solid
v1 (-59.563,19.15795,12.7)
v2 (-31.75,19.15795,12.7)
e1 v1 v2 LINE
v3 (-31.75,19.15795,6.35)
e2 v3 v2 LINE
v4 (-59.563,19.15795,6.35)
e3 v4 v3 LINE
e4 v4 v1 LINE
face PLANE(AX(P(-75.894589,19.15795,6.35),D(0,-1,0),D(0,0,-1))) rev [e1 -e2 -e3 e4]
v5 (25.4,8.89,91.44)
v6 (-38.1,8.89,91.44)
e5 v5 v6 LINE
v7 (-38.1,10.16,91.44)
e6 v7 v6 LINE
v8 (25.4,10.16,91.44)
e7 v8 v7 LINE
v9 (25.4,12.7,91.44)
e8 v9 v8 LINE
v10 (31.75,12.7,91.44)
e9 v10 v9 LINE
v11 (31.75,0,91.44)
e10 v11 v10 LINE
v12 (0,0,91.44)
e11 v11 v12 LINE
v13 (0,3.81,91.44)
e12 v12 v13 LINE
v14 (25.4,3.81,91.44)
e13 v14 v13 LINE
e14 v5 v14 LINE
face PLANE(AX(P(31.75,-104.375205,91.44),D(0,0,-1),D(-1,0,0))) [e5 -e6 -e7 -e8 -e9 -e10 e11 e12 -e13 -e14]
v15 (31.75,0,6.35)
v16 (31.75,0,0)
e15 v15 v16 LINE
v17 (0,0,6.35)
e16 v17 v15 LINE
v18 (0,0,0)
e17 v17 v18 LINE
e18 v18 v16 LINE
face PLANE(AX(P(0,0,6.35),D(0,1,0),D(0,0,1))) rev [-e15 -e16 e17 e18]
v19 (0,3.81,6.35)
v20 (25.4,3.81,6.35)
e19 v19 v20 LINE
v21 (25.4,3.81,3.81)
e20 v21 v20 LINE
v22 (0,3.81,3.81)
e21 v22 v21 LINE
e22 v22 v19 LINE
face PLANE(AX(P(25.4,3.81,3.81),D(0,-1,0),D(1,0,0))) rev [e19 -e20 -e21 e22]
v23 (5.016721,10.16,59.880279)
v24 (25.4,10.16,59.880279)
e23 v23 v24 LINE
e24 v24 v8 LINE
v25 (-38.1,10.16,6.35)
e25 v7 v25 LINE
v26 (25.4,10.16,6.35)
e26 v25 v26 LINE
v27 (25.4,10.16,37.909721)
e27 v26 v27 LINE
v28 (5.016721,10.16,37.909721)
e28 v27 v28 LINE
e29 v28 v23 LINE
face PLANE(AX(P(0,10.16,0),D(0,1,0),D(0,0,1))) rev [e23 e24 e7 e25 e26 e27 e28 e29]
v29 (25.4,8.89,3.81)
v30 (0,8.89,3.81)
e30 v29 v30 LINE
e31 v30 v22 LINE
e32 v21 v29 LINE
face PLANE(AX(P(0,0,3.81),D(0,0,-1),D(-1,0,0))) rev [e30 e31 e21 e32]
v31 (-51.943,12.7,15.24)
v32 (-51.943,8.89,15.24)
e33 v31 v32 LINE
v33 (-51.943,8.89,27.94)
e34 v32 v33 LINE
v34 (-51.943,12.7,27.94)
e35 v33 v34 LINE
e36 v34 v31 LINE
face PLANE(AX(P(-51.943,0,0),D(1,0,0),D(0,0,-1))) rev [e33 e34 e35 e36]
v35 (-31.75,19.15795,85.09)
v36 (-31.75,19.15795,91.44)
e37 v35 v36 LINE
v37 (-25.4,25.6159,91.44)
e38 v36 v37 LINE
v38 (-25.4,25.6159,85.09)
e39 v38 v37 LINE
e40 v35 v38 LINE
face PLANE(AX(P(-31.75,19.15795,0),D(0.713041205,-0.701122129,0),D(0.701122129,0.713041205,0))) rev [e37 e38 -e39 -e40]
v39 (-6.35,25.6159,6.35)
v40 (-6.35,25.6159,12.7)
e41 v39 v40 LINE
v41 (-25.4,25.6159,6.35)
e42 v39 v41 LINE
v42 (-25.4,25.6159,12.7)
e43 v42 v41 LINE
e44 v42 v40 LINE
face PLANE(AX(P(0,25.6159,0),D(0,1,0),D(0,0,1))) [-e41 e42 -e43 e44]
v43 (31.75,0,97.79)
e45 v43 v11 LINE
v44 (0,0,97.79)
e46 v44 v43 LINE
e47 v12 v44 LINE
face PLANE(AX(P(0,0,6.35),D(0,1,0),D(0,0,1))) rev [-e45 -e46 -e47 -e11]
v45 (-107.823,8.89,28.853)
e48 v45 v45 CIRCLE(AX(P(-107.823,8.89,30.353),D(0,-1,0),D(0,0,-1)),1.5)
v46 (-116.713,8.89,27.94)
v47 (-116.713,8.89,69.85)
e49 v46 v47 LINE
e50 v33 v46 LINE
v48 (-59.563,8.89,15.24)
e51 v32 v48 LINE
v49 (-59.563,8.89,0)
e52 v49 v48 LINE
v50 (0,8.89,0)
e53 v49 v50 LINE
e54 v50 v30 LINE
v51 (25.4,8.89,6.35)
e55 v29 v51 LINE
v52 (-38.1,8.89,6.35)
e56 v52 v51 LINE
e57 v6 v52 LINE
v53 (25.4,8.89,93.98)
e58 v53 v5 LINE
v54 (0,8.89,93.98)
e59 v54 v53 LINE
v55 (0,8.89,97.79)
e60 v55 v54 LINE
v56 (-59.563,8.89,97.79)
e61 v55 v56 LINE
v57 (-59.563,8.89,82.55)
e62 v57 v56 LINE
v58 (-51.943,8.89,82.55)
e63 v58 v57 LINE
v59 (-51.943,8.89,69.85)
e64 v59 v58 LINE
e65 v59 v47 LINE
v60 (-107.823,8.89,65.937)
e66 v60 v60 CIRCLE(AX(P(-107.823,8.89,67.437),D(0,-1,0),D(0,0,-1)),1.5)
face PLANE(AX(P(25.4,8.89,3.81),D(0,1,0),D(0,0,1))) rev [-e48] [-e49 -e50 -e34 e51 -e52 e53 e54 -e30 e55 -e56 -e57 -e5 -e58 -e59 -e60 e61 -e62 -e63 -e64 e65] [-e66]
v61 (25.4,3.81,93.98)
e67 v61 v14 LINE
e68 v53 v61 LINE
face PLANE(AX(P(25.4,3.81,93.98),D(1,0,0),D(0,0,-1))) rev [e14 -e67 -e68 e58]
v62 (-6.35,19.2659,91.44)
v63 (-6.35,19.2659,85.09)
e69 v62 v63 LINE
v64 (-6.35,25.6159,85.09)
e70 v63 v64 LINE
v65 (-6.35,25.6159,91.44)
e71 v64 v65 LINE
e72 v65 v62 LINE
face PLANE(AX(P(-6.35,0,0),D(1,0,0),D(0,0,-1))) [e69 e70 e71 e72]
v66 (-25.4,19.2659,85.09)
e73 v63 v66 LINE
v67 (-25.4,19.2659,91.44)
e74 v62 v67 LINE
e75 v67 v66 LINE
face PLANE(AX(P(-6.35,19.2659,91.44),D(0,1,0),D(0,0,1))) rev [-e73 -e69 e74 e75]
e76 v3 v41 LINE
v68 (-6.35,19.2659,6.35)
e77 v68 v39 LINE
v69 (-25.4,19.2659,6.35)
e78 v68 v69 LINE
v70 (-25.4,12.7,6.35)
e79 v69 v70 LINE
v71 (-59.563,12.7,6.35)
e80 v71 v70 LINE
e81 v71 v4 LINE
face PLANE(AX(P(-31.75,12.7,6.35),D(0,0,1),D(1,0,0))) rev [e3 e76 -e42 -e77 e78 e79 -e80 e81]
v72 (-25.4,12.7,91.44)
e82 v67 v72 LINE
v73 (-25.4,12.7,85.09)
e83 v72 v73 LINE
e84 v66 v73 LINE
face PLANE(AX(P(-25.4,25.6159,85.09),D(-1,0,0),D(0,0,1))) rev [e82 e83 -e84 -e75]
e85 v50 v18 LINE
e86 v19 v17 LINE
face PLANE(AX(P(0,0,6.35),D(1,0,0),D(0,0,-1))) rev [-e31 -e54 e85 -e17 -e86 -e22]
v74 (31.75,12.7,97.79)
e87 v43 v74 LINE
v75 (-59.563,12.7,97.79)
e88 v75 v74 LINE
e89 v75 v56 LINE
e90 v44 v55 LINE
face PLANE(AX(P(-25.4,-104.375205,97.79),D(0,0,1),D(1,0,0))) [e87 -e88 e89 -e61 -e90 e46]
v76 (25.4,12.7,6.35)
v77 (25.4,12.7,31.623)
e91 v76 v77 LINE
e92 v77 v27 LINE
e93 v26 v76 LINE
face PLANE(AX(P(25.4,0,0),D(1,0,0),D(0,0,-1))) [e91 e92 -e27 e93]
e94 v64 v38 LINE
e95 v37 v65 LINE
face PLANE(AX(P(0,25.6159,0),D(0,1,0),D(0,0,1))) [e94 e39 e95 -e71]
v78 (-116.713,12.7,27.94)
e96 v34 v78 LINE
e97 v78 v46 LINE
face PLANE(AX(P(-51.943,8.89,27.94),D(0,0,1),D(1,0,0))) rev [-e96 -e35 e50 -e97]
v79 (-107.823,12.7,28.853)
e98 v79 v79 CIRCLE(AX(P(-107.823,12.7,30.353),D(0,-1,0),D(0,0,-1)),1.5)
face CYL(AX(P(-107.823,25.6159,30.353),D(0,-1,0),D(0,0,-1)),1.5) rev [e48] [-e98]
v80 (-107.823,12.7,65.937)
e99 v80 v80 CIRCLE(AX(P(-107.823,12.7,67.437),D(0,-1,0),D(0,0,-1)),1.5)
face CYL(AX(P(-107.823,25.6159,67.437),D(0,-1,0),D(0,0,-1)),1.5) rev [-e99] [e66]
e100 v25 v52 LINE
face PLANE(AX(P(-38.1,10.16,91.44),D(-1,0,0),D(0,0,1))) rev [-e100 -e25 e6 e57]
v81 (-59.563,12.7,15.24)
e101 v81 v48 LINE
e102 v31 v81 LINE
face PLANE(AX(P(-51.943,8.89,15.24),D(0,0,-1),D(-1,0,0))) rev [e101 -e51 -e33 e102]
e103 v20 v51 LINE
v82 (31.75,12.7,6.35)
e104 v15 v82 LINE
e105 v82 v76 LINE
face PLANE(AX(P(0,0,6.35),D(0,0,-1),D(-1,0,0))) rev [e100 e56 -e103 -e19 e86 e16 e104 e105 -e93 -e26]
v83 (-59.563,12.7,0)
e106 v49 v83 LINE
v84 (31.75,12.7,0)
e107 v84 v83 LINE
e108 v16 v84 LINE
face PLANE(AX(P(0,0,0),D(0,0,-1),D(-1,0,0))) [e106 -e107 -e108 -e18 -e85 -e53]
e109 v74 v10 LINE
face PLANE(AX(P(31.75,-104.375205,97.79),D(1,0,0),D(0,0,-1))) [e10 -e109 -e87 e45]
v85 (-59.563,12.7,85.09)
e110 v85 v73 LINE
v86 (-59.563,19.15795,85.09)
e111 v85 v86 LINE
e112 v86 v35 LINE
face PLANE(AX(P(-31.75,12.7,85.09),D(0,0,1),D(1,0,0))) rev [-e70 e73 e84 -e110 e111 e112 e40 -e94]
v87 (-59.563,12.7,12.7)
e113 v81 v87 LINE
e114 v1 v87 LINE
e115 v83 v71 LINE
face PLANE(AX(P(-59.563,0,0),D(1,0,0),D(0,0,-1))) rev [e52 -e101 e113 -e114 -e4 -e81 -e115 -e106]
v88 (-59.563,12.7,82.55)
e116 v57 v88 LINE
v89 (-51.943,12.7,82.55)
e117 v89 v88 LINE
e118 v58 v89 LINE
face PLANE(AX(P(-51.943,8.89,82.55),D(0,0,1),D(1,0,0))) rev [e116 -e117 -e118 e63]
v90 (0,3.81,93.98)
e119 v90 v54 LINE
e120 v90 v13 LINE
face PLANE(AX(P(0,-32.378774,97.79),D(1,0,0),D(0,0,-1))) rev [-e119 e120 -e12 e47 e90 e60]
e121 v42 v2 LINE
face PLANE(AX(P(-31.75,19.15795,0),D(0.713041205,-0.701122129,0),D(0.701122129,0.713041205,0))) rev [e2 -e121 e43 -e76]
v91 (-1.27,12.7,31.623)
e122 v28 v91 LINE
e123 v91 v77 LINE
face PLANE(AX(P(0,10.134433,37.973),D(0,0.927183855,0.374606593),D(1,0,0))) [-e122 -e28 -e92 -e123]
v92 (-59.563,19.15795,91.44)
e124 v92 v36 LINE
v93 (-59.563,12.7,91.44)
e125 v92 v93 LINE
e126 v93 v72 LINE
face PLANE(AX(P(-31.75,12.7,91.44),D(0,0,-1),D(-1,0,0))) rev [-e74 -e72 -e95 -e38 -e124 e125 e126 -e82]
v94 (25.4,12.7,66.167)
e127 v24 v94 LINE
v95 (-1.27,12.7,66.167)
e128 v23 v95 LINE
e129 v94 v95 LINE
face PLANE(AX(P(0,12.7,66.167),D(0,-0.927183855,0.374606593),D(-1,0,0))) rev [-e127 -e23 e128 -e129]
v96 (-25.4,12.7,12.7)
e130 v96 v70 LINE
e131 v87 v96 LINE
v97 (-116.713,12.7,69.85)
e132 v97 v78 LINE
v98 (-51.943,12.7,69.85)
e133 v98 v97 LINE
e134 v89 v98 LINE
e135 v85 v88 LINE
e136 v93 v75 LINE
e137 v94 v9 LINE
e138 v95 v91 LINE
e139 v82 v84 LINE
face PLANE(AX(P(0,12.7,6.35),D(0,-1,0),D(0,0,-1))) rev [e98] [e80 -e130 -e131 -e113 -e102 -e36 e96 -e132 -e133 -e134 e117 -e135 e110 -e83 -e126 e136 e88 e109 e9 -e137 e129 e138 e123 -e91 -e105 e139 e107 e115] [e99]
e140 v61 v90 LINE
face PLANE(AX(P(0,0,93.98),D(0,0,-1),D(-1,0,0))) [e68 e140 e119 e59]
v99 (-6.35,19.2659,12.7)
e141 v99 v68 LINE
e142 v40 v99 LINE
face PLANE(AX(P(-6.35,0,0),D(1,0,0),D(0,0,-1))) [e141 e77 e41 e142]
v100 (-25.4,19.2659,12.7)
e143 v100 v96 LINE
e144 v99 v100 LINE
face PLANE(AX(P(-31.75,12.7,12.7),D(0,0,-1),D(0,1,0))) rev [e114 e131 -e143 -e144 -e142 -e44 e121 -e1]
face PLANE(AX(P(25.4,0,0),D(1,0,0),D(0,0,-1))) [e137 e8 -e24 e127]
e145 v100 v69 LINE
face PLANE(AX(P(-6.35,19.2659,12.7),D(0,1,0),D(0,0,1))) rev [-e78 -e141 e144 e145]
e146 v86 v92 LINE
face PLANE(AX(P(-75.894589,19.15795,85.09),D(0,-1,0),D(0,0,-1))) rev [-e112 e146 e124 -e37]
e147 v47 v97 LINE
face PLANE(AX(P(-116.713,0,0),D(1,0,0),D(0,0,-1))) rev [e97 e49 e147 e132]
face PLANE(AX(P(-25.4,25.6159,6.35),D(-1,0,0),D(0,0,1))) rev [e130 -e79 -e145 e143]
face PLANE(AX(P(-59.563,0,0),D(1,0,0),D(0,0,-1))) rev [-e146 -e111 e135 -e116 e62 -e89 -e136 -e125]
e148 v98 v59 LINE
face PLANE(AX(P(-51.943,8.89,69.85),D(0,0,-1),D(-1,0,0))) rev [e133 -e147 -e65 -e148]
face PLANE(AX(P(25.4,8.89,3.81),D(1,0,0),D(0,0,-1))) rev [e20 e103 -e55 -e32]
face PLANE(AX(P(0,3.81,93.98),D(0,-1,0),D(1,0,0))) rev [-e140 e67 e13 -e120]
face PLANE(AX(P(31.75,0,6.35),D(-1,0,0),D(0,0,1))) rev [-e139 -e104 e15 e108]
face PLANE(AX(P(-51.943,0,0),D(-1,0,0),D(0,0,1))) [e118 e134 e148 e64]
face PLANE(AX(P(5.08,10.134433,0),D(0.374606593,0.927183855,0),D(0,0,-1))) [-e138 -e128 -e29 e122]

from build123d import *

# Parameters (mm, degrees)
SKETCH1_W                = 31.75
SKETCH1_H                = 12.7
BOSS_EXTRUDE1_DEPTH      = 6.35
SKETCH3_W                = 25.4
SKETCH3_H                = 5.08
CUT_EXTRUDE1_DEPTH       = 2.54
BOSS_EXTRUDE2_DEPTH      = 3.81
SKETCH5_W                = 31.75
SKETCH5_H                = 6.35
BOSS_EXTRUDE3_DEPTH      = 8.89
SKETCH6_W                = 25.4
SKETCH6_H                = 5.08
CUT_EXTRUDE2_DEPTH       = 2.54
SKETCH9_W                = 6.35
SKETCH9_H                = 3.81
BOSS_EXTRUDE5_DEPTH      = 6.35
SKETCH10_W               = 6.35
SKETCH10_H               = 6.35
BOSS_EXTRUDE6_DEPTH      = 12.9159
SKETCH12_W               = 6.35
SKETCH12_H               = 3.81
BOSS_EXTRUDE8_DEPTH      = 6.35
SKETCH14_W               = 6.35
SKETCH14_H               = 6.35
BOSS_EXTRUDE11_DEPTH     = 19.05
CUT_EXTRUDE9_DEPTH       = 101.12747092
SKETCH19_W               = 72.39
SKETCH19_H               = 3.81
BOSS_EXTRUDE12_DEPTH     = 34.163
BOSS_EXTRUDE13_DEPTH     = 27.813
SKETCH21_W               = 12.7
SKETCH21_H               = 3.81
CUT_EXTRUDE10_DEPTH      = 7.62
SKETCH22_W               = 41.91
SKETCH22_H               = 3.81
BOSS_EXTRUDE14_DEPTH     = 50.8
SKETCH23_W               = 85.09
SKETCH23_H               = 3.81
BOSS_EXTRUDE15_DEPTH     = 44.45
SKETCH24_R               = 1.5
CUT_EXTRUDE11_DEPTH      = 149.400241239
SKETCH25_W               = 41.91
SKETCH25_H               = 3.81
BOSS_EXTRUDE16_DEPTH     = 6.35
CUT_EXTRUDE12_DEPTH      = 154.181474728
CUT_EXTRUDE12_DEPTH_BACK = 154.181474728
CUT_EXTRUDE13_DEPTH      = 1.27
CHAMFER1_SIZE            = 6.35
CHAMFER1_SIZE_2          = 2.565566534


with BuildPart() as part:
    # Sketch1 → Boss-Extrude1 (new body)
    with BuildSketch(Plane.XY):
        with Locations((15.875, 6.35)):
            Rectangle(SKETCH1_W, SKETCH1_H)
    extrude(amount=BOSS_EXTRUDE1_DEPTH)

    # Sketch3 → Cut-Extrude1 (cut)
    with BuildSketch(Plane.XY.offset(6.35)):
        with Locations((12.7, 6.35)):
            Rectangle(SKETCH3_W, SKETCH3_H)
    extrude(amount=-CUT_EXTRUDE1_DEPTH, mode=Mode.SUBTRACT)

    # Sketch4 → Boss-Extrude2 (add)
    with BuildSketch(Plane(origin=(0, 12.7, 0), x_dir=(1, 0, 0), z_dir=(0, 1, 0))):
        Polygon((0, 0), (-25.4, 0), (-25.4, -97.79), (31.75, -97.79), (31.75, -91.44), (-19.05, -91.44), (-19.05, -6.35), (0, -6.35), align=None)
    extrude(amount=-BOSS_EXTRUDE2_DEPTH)

    # Sketch5 → Boss-Extrude3 (add)
    with BuildSketch(Plane.XZ.offset(-8.89)):
        with Locations((15.875, 94.615)):
            Rectangle(SKETCH5_W, SKETCH5_H)
    extrude(amount=BOSS_EXTRUDE3_DEPTH)

    # Sketch6 → Cut-Extrude2 (cut)
    with BuildSketch(Plane(origin=(0, 0, 91.44), x_dir=(-1, 0, 0), z_dir=(0, 0, -1))):
        with Locations((-12.7, 6.35)):
            Rectangle(SKETCH6_W, SKETCH6_H)
    extrude(amount=-CUT_EXTRUDE2_DEPTH, mode=Mode.SUBTRACT)

    # Sketch9 → Boss-Extrude5 (add)
    with BuildSketch(Plane.ZY.offset(25.4)):
        with Locations((88.265, 10.795)):
            Rectangle(SKETCH9_W, SKETCH9_H)
        with Locations((9.525, 10.795)):
            Rectangle(SKETCH9_W, SKETCH9_H)
    extrude(amount=BOSS_EXTRUDE5_DEPTH)

    # Sketch10 → Boss-Extrude6 (add)
    with BuildSketch(Plane(origin=(0, 12.7, 0), x_dir=(1, 0, 0), z_dir=(0, 1, 0))):
        with Locations((-28.575, -88.265)):
            Rectangle(SKETCH10_W, SKETCH10_H)
        with Locations((-28.575, -9.525)):
            Rectangle(SKETCH10_W, SKETCH10_H)
    extrude(amount=BOSS_EXTRUDE6_DEPTH)

    # Sketch12 → Boss-Extrude8 (add)
    with BuildSketch(Plane.ZY.offset(25.4)):
        with Locations((94.615, 10.795)):
            Rectangle(SKETCH12_W, SKETCH12_H)
        with Locations((3.175, 10.795)):
            Rectangle(SKETCH12_W, SKETCH12_H)
    extrude(amount=BOSS_EXTRUDE8_DEPTH)

    # Sketch14 → Boss-Extrude11 (add)
    with BuildSketch(Plane(origin=(-25.4, 0, 0), x_dir=(0, 0, -1), z_dir=(1, 0, 0))):
        with Locations((-88.265, 22.4409)):
            Rectangle(SKETCH14_W, SKETCH14_H)
        with Locations((-9.525, 22.4409)):
            Rectangle(SKETCH14_W, SKETCH14_H)
    extrude(amount=BOSS_EXTRUDE11_DEPTH)

    # Sketch18 → Cut-Extrude9 (cut, through all)
    with BuildSketch(Plane.XY.offset(91.44)):
        Polygon((-31.75, 19.15795), (-25.4, 25.6159), (-31.75, 25.6159), align=None)
    extrude(amount=-CUT_EXTRUDE9_DEPTH, mode=Mode.SUBTRACT)

    # Sketch19 → Boss-Extrude12 (add)
    with BuildSketch(Plane.ZY.offset(25.4)):
        with Locations((48.895, 10.795)):
            Rectangle(SKETCH19_W, SKETCH19_H)
    extrude(amount=BOSS_EXTRUDE12_DEPTH)

    # Sketch20 → Boss-Extrude13 (add)
    with BuildSketch(Plane.ZY.offset(31.75)):
        Polygon((0, 8.89), (0, 12.7), (6.35, 12.7), (6.35, 19.15795), (12.7, 19.15795), (12.7, 8.89), align=None)
        Polygon((85.09, 19.15795), (91.44, 19.15795), (91.44, 12.7), (97.79, 12.7), (97.79, 8.89), (85.09, 8.89), align=None)
    extrude(amount=BOSS_EXTRUDE13_DEPTH)

    # Sketch21 → Cut-Extrude10 (cut)
    with BuildSketch(Plane.ZY.offset(59.563)):
        with Locations((21.59, 10.795)):
            Rectangle(SKETCH21_W, SKETCH21_H)
        with Locations((76.2, 10.795)):
            Rectangle(SKETCH21_W, SKETCH21_H)
    extrude(amount=-CUT_EXTRUDE10_DEPTH, mode=Mode.SUBTRACT)

    # Sketch22 → Boss-Extrude14 (add)
    with BuildSketch(Plane.ZY.offset(59.563)):
        with Locations((48.895, 10.795)):
            Rectangle(SKETCH22_W, SKETCH22_H)
    extrude(amount=BOSS_EXTRUDE14_DEPTH)

    # Sketch23 → Boss-Extrude15 (add)
    with BuildSketch(Plane(origin=(-19.05, 0, 0), x_dir=(0, 0, -1), z_dir=(1, 0, 0))):
        with Locations((-48.895, 10.795)):
            Rectangle(SKETCH23_W, SKETCH23_H)
    extrude(amount=BOSS_EXTRUDE15_DEPTH)

    # Sketch24 → Cut-Extrude11 (cut, through all)
    with BuildSketch(Plane.XZ.offset(-8.89)):
        with Locations(Location((-107.823, 30.353, 0), (0, 0, 270))):
            Circle(SKETCH24_R)
        with Locations(Location((-107.823, 67.437, 0), (0, 0, 270))):
            Circle(SKETCH24_R)
    extrude(amount=-CUT_EXTRUDE11_DEPTH, mode=Mode.SUBTRACT)

    # Sketch25 → Boss-Extrude16 (add)
    with BuildSketch(Plane.ZY.offset(110.363)):
        with Locations((48.895, 10.795)):
            Rectangle(SKETCH25_W, SKETCH25_H)
    extrude(amount=BOSS_EXTRUDE16_DEPTH)

    # Sketch26 → Cut-Extrude12 (cut, two sides: drawn at the far end of the back side and taken through both)
    with BuildSketch(Plane.XZ.offset(-8.89).offset(-CUT_EXTRUDE12_DEPTH_BACK)):
        Polygon((25.4, 37.973), (25.4, 48.895), (25.4, 59.817), (5.08, 59.817), (5.08, 37.973), align=None)
    extrude(amount=CUT_EXTRUDE12_DEPTH + CUT_EXTRUDE12_DEPTH_BACK, mode=Mode.SUBTRACT)

    # Sketch27 → Cut-Extrude13 (cut)
    with BuildSketch(Plane.XZ.offset(-8.89)):
        Polygon((25.4, 37.973), (25.4, 6.35), (-38.1, 6.35), (-38.1, 91.44), (25.4, 91.44), (25.4, 59.817), (5.08, 59.817), (5.08, 37.973), align=None)
    extrude(amount=-CUT_EXTRUDE13_DEPTH, mode=Mode.SUBTRACT)

    # Chamfer1
    # the kernel refuses this chamfer: 6.35, 2.565566534 mm, written as the material it takes off along each edge
    with BuildSketch(Plane(origin=(5.08, 12.7, 59.817), x_dir=(0, 0.014446902557764131, 0.9998956380575357), z_dir=(1, 0, 0)), Plane(origin=(41.865480117, 12.7, 37.973), x_dir=(0, 0.014446902557764124, -0.9998956380575357), z_dir=(-1, 0, 0))) as chamfer1_piece_1:
        Polygon((CHAMFER1_SIZE * 0.999895638058, CHAMFER1_SIZE * 0.0144469025578), (-CHAMFER1_SIZE_2 * 0.0144469025581, CHAMFER1_SIZE_2 * 0.999895638078), (0, 0), align=None)
    extrude(amount=36.785480117, mode=Mode.SUBTRACT)
    with BuildSketch(Plane(origin=(5.08, 12.7, 37.973), x_dir=(-0.9998956380575357, 0.01444690255776412, 0), z_dir=(0, 0, 1))) as chamfer1_piece_2:
        Polygon((CHAMFER1_SIZE * 0.999895638058, CHAMFER1_SIZE * 0.0144469025578), (-CHAMFER1_SIZE_2 * 0.0144469025581, CHAMFER1_SIZE_2 * 0.999895638078), (0, 0), align=None)
    extrude(amount=21.844, mode=Mode.SUBTRACT)
    with BuildSketch(Plane(origin=(-11.385480117, 12.7, 59.817), x_dir=(0, 0.014446902557764131, 0.9998956380575357), z_dir=(1, 0, 0))) as chamfer1_piece_3a_section:
        Polygon((CHAMFER1_SIZE * 0.999895638058, CHAMFER1_SIZE * 0.0144469025578), (-CHAMFER1_SIZE_2 * 0.0144469025581, CHAMFER1_SIZE_2 * 0.999895638078), (0, 0), align=None)
    chamfer1_piece_3a = extrude(amount=53.250960234, mode=Mode.PRIVATE)
    chamfer1_piece_3a = split(chamfer1_piece_3a, bisect_by=Plane(origin=(5.08, 11.901985968, 61.978678206), z_dir=(-1, 0, 0)), keep=Keep.TOP, mode=Mode.PRIVATE)
    with BuildSketch(Plane(origin=(5.08, 12.7, 37.973), x_dir=(-0.9998956380575357, 0.01444690255776412, 0), z_dir=(0, 0, 1))) as chamfer1_piece_3b_section:
        Polygon((CHAMFER1_SIZE * 0.999895638058, CHAMFER1_SIZE * 0.0144469025578), (-CHAMFER1_SIZE_2 * 0.0144469025581, CHAMFER1_SIZE_2 * 0.999895638078), (0, 0), align=None)
    chamfer1_piece_3b = extrude(amount=38.309480117, mode=Mode.PRIVATE)
    chamfer1_piece_3b = split(chamfer1_piece_3b, bisect_by=Plane(origin=(2.918321794, 11.901985968, 59.817), z_dir=(0, 0, 1)), keep=Keep.TOP, mode=Mode.PRIVATE)
    chamfer1_piece_3 = chamfer1_piece_3a & chamfer1_piece_3b
    add(chamfer1_piece_3, mode=Mode.SUBTRACT)
    with BuildSketch(Plane(origin=(5.08, 12.7, 21.507519883), x_dir=(-0.9998956380575357, 0.01444690255776412, 0), z_dir=(0, 0, 1))) as chamfer1_piece_4a_section:
        Polygon((CHAMFER1_SIZE * 0.999895638058, CHAMFER1_SIZE * 0.0144469025578), (-CHAMFER1_SIZE_2 * 0.0144469025581, CHAMFER1_SIZE_2 * 0.999895638078), (0, 0), align=None)
    chamfer1_piece_4a = extrude(amount=38.309480117, mode=Mode.PRIVATE)
    chamfer1_piece_4a = split(chamfer1_piece_4a, bisect_by=Plane(origin=(2.918321794, 11.901985968, 37.973), z_dir=(0, 0, -1)), keep=Keep.TOP, mode=Mode.PRIVATE)
    with BuildSketch(Plane(origin=(41.865480117, 12.7, 37.973), x_dir=(0, 0.014446902557764124, -0.9998956380575357), z_dir=(-1, 0, 0))) as chamfer1_piece_4b_section:
        Polygon((CHAMFER1_SIZE * 0.999895638058, CHAMFER1_SIZE * 0.0144469025578), (-CHAMFER1_SIZE_2 * 0.0144469025581, CHAMFER1_SIZE_2 * 0.999895638078), (0, 0), align=None)
    chamfer1_piece_4b = extrude(amount=53.250960234, mode=Mode.PRIVATE)
    chamfer1_piece_4b = split(chamfer1_piece_4b, bisect_by=Plane(origin=(5.08, 11.901985968, 35.811321794), z_dir=(-1, 0, 0)), keep=Keep.TOP, mode=Mode.PRIVATE)
    chamfer1_piece_4 = chamfer1_piece_4a & chamfer1_piece_4b
    add(chamfer1_piece_4, mode=Mode.SUBTRACT)


solid = part.part
